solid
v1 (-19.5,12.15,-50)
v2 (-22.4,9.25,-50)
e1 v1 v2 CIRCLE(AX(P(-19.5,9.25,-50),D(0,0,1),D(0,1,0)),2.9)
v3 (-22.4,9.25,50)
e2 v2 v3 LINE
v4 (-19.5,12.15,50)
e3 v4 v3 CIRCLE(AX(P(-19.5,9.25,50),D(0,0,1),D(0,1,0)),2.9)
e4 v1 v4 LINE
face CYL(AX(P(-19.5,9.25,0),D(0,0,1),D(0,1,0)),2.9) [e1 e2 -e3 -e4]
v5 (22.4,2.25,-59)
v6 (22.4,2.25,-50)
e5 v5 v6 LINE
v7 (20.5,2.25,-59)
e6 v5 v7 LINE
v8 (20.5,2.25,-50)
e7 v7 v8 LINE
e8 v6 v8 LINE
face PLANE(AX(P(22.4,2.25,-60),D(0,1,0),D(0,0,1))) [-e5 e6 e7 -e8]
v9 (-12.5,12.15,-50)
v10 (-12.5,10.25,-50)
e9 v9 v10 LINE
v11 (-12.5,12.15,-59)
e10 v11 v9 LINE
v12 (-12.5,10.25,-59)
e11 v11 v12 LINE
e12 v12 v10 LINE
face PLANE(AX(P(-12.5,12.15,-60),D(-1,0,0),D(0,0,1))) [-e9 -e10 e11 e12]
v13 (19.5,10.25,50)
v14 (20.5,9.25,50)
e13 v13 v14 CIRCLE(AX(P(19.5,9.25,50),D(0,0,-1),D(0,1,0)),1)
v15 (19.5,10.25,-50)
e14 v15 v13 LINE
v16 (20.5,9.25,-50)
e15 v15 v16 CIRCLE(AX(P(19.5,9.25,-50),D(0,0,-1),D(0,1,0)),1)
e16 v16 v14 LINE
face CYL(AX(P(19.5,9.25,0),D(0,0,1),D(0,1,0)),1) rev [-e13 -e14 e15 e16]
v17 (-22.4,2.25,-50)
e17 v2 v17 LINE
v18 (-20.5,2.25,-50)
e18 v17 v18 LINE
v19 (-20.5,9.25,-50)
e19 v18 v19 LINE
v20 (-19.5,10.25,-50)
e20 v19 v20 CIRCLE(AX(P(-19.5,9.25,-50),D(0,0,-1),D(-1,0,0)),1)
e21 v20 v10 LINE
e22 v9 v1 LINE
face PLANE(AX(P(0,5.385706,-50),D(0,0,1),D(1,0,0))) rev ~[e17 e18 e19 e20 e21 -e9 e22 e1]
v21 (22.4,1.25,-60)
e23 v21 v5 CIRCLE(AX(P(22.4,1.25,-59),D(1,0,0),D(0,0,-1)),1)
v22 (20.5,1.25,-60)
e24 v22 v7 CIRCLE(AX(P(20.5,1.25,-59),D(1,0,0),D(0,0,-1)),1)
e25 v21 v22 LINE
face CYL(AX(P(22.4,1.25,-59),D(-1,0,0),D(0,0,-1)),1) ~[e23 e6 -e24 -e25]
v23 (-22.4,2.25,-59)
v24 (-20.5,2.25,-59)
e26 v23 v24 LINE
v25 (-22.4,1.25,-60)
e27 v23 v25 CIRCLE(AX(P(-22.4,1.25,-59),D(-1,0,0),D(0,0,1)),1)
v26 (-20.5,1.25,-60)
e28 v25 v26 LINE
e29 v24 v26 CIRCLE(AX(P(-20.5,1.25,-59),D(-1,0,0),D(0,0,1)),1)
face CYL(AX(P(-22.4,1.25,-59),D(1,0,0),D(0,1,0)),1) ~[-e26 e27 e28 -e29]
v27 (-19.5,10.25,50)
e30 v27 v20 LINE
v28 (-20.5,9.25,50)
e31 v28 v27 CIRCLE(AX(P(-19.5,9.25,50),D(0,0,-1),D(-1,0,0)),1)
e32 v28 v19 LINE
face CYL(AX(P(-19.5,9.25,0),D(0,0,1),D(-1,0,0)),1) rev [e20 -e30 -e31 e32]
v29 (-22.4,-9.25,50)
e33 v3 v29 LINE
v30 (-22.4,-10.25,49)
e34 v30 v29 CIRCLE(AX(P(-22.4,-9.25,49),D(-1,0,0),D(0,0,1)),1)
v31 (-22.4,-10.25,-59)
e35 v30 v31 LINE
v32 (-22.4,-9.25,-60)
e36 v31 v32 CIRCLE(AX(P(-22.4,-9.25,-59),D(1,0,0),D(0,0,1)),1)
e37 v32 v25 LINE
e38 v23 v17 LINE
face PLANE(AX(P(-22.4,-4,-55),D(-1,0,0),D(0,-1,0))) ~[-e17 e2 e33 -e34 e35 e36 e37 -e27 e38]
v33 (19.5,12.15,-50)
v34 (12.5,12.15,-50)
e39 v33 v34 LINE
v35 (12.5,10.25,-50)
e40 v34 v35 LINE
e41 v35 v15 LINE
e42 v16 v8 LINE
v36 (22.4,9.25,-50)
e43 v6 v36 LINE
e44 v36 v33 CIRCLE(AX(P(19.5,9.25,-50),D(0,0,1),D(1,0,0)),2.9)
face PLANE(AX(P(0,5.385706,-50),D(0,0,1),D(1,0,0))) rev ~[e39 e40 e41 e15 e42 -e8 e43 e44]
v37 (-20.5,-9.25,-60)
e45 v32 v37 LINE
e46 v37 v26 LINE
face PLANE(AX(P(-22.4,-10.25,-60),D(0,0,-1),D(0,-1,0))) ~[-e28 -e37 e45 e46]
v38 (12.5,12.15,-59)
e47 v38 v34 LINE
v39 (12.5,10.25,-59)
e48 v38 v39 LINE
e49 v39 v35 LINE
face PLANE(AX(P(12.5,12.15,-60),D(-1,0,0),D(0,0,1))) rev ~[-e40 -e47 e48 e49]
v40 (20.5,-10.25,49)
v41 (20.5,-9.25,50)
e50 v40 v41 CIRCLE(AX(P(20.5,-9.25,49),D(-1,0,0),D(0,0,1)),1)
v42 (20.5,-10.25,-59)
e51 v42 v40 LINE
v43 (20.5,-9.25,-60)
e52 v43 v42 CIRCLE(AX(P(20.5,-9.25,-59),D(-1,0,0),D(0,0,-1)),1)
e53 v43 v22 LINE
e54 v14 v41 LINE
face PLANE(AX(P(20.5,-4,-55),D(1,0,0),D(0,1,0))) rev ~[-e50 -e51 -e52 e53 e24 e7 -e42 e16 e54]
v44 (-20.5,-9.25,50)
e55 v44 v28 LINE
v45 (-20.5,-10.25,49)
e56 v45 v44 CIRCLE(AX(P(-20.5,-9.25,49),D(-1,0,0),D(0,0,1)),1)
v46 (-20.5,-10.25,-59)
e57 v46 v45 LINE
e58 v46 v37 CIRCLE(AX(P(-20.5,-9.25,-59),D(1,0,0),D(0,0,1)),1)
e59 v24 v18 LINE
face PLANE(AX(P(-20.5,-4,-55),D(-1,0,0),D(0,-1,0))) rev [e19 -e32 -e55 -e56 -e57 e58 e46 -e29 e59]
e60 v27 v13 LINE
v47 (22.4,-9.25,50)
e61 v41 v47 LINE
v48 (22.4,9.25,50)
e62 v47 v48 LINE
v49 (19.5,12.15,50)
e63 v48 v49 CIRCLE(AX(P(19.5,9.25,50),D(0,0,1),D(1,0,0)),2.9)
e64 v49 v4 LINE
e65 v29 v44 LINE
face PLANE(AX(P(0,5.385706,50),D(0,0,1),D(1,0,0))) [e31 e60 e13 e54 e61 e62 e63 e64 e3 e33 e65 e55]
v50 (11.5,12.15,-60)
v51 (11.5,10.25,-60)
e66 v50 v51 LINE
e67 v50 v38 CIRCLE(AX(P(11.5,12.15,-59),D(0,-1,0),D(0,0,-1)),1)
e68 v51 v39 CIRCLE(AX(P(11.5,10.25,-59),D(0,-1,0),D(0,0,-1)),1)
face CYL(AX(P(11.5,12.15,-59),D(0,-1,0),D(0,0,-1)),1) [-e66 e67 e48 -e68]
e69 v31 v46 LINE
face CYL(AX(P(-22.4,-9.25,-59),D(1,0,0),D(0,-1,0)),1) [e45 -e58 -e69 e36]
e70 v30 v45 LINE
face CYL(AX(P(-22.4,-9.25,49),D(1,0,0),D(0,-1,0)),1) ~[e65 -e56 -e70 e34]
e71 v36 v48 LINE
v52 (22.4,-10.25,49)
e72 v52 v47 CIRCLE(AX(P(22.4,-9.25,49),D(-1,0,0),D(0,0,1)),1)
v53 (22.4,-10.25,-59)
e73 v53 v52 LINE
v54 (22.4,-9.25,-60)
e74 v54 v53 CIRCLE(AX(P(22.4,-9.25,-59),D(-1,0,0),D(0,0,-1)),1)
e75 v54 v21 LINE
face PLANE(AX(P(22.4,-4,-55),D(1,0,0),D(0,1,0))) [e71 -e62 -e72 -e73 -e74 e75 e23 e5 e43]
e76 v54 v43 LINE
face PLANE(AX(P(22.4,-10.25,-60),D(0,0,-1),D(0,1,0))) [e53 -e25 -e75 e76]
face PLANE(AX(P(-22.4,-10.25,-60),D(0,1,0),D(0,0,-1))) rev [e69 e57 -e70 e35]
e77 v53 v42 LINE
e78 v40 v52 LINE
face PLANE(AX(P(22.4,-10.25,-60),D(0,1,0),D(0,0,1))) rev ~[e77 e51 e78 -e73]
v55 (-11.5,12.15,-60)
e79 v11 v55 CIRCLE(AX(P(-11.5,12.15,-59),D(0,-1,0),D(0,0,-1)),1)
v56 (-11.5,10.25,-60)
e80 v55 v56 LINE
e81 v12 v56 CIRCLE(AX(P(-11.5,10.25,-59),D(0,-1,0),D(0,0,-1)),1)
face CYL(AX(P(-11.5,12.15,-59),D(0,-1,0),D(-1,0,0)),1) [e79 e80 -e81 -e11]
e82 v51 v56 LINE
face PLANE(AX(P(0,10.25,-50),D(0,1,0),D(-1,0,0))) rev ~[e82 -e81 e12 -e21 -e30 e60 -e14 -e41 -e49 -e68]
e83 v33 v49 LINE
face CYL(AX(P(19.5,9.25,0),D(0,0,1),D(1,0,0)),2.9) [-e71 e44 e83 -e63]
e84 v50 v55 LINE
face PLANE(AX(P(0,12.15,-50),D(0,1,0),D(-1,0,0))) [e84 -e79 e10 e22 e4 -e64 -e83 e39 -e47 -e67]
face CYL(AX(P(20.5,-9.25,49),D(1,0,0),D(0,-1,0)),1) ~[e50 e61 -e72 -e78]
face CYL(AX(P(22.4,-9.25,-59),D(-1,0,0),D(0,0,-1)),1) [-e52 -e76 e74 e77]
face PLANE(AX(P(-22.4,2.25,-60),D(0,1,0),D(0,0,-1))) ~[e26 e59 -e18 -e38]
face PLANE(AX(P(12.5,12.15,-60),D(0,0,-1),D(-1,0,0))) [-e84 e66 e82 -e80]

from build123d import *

# Parameters (mm, degrees)
F1_DEPTH = 50
F2_W     = 25
F2_H     = 20
F3_DEPTH = 1.9
F4_W     = 12.5
F4_H     = 10
F5_DEPTH = 1.9
F7_R     = 1


with BuildPart() as f1:
    # F0 (on Top) → F1 (new body, symmetric)
    with BuildSketch(Plane.XY):
        with BuildLine():
            Line((-19.5, 10.25), (19.5, 10.25))
            ThreePointArc((19.5, 10.25), (20.2071067812, 9.9571067812), (20.5, 9.25))
            Line((20.5, 9.25), (20.5, -10.25))
            Line((20.5, -10.25), (22.4, -10.25))
            Line((22.4, -10.25), (22.4, 9.25))
            ThreePointArc((22.4, 9.25), (21.5506096654, 11.3006096654), (19.5, 12.15))
            Line((19.5, 12.15), (-19.5, 12.15))
            ThreePointArc((-19.5, 12.15), (-21.5506096654, 11.3006096654), (-22.4, 9.25))
            Line((-22.4, 9.25), (-22.4, -10.25))
            Line((-22.4, -10.25), (-20.5, -10.25))
            Line((-20.5, -10.25), (-20.5, 9.25))
            ThreePointArc((-20.5, 9.25), (-20.2071067812, 9.9571067812), (-19.5, 10.25))
        make_face()
    extrude(amount=F1_DEPTH, both=True)

    # F2 (on face) → F3 (join, through all)
    with BuildSketch(Plane(origin=(0, 12.15, 0), x_dir=(-1, 0, 0), z_dir=(0, 1, 0))):
        with Locations((0, -50)):
            Rectangle(F2_W, F2_H)
    extrude(amount=-F3_DEPTH)

    # F4 (on face) → F5 (join, through all)
    with BuildSketch(Plane.YZ.offset(22.4)):
        with Locations((-4, -55)):
            Rectangle(F4_W, F4_H)
    extrude(amount=-F5_DEPTH)

    # F6: F1 across plane


with BuildPart() as f1_1:
    add(f1.part)
    add(f1.part.mirror(Plane.YZ))

    # F7
    f7_edges = [f1_1.edges().sort_by_distance(p)[0] for p in [
        (21.45, -10.25, 50),
        (-21.45, -10.25, 50),
        (12.5, 11.2, -60),
        (-12.5, 11.2, -60),
        (21.45, 2.25, -60),
        (-21.45, 2.25, -60),
        (21.45, -10.25, -60),
        (-21.45, -10.25, -60),
    ]]
    fillet(f7_edges, radius=F7_R)


solid = f1_1.part
